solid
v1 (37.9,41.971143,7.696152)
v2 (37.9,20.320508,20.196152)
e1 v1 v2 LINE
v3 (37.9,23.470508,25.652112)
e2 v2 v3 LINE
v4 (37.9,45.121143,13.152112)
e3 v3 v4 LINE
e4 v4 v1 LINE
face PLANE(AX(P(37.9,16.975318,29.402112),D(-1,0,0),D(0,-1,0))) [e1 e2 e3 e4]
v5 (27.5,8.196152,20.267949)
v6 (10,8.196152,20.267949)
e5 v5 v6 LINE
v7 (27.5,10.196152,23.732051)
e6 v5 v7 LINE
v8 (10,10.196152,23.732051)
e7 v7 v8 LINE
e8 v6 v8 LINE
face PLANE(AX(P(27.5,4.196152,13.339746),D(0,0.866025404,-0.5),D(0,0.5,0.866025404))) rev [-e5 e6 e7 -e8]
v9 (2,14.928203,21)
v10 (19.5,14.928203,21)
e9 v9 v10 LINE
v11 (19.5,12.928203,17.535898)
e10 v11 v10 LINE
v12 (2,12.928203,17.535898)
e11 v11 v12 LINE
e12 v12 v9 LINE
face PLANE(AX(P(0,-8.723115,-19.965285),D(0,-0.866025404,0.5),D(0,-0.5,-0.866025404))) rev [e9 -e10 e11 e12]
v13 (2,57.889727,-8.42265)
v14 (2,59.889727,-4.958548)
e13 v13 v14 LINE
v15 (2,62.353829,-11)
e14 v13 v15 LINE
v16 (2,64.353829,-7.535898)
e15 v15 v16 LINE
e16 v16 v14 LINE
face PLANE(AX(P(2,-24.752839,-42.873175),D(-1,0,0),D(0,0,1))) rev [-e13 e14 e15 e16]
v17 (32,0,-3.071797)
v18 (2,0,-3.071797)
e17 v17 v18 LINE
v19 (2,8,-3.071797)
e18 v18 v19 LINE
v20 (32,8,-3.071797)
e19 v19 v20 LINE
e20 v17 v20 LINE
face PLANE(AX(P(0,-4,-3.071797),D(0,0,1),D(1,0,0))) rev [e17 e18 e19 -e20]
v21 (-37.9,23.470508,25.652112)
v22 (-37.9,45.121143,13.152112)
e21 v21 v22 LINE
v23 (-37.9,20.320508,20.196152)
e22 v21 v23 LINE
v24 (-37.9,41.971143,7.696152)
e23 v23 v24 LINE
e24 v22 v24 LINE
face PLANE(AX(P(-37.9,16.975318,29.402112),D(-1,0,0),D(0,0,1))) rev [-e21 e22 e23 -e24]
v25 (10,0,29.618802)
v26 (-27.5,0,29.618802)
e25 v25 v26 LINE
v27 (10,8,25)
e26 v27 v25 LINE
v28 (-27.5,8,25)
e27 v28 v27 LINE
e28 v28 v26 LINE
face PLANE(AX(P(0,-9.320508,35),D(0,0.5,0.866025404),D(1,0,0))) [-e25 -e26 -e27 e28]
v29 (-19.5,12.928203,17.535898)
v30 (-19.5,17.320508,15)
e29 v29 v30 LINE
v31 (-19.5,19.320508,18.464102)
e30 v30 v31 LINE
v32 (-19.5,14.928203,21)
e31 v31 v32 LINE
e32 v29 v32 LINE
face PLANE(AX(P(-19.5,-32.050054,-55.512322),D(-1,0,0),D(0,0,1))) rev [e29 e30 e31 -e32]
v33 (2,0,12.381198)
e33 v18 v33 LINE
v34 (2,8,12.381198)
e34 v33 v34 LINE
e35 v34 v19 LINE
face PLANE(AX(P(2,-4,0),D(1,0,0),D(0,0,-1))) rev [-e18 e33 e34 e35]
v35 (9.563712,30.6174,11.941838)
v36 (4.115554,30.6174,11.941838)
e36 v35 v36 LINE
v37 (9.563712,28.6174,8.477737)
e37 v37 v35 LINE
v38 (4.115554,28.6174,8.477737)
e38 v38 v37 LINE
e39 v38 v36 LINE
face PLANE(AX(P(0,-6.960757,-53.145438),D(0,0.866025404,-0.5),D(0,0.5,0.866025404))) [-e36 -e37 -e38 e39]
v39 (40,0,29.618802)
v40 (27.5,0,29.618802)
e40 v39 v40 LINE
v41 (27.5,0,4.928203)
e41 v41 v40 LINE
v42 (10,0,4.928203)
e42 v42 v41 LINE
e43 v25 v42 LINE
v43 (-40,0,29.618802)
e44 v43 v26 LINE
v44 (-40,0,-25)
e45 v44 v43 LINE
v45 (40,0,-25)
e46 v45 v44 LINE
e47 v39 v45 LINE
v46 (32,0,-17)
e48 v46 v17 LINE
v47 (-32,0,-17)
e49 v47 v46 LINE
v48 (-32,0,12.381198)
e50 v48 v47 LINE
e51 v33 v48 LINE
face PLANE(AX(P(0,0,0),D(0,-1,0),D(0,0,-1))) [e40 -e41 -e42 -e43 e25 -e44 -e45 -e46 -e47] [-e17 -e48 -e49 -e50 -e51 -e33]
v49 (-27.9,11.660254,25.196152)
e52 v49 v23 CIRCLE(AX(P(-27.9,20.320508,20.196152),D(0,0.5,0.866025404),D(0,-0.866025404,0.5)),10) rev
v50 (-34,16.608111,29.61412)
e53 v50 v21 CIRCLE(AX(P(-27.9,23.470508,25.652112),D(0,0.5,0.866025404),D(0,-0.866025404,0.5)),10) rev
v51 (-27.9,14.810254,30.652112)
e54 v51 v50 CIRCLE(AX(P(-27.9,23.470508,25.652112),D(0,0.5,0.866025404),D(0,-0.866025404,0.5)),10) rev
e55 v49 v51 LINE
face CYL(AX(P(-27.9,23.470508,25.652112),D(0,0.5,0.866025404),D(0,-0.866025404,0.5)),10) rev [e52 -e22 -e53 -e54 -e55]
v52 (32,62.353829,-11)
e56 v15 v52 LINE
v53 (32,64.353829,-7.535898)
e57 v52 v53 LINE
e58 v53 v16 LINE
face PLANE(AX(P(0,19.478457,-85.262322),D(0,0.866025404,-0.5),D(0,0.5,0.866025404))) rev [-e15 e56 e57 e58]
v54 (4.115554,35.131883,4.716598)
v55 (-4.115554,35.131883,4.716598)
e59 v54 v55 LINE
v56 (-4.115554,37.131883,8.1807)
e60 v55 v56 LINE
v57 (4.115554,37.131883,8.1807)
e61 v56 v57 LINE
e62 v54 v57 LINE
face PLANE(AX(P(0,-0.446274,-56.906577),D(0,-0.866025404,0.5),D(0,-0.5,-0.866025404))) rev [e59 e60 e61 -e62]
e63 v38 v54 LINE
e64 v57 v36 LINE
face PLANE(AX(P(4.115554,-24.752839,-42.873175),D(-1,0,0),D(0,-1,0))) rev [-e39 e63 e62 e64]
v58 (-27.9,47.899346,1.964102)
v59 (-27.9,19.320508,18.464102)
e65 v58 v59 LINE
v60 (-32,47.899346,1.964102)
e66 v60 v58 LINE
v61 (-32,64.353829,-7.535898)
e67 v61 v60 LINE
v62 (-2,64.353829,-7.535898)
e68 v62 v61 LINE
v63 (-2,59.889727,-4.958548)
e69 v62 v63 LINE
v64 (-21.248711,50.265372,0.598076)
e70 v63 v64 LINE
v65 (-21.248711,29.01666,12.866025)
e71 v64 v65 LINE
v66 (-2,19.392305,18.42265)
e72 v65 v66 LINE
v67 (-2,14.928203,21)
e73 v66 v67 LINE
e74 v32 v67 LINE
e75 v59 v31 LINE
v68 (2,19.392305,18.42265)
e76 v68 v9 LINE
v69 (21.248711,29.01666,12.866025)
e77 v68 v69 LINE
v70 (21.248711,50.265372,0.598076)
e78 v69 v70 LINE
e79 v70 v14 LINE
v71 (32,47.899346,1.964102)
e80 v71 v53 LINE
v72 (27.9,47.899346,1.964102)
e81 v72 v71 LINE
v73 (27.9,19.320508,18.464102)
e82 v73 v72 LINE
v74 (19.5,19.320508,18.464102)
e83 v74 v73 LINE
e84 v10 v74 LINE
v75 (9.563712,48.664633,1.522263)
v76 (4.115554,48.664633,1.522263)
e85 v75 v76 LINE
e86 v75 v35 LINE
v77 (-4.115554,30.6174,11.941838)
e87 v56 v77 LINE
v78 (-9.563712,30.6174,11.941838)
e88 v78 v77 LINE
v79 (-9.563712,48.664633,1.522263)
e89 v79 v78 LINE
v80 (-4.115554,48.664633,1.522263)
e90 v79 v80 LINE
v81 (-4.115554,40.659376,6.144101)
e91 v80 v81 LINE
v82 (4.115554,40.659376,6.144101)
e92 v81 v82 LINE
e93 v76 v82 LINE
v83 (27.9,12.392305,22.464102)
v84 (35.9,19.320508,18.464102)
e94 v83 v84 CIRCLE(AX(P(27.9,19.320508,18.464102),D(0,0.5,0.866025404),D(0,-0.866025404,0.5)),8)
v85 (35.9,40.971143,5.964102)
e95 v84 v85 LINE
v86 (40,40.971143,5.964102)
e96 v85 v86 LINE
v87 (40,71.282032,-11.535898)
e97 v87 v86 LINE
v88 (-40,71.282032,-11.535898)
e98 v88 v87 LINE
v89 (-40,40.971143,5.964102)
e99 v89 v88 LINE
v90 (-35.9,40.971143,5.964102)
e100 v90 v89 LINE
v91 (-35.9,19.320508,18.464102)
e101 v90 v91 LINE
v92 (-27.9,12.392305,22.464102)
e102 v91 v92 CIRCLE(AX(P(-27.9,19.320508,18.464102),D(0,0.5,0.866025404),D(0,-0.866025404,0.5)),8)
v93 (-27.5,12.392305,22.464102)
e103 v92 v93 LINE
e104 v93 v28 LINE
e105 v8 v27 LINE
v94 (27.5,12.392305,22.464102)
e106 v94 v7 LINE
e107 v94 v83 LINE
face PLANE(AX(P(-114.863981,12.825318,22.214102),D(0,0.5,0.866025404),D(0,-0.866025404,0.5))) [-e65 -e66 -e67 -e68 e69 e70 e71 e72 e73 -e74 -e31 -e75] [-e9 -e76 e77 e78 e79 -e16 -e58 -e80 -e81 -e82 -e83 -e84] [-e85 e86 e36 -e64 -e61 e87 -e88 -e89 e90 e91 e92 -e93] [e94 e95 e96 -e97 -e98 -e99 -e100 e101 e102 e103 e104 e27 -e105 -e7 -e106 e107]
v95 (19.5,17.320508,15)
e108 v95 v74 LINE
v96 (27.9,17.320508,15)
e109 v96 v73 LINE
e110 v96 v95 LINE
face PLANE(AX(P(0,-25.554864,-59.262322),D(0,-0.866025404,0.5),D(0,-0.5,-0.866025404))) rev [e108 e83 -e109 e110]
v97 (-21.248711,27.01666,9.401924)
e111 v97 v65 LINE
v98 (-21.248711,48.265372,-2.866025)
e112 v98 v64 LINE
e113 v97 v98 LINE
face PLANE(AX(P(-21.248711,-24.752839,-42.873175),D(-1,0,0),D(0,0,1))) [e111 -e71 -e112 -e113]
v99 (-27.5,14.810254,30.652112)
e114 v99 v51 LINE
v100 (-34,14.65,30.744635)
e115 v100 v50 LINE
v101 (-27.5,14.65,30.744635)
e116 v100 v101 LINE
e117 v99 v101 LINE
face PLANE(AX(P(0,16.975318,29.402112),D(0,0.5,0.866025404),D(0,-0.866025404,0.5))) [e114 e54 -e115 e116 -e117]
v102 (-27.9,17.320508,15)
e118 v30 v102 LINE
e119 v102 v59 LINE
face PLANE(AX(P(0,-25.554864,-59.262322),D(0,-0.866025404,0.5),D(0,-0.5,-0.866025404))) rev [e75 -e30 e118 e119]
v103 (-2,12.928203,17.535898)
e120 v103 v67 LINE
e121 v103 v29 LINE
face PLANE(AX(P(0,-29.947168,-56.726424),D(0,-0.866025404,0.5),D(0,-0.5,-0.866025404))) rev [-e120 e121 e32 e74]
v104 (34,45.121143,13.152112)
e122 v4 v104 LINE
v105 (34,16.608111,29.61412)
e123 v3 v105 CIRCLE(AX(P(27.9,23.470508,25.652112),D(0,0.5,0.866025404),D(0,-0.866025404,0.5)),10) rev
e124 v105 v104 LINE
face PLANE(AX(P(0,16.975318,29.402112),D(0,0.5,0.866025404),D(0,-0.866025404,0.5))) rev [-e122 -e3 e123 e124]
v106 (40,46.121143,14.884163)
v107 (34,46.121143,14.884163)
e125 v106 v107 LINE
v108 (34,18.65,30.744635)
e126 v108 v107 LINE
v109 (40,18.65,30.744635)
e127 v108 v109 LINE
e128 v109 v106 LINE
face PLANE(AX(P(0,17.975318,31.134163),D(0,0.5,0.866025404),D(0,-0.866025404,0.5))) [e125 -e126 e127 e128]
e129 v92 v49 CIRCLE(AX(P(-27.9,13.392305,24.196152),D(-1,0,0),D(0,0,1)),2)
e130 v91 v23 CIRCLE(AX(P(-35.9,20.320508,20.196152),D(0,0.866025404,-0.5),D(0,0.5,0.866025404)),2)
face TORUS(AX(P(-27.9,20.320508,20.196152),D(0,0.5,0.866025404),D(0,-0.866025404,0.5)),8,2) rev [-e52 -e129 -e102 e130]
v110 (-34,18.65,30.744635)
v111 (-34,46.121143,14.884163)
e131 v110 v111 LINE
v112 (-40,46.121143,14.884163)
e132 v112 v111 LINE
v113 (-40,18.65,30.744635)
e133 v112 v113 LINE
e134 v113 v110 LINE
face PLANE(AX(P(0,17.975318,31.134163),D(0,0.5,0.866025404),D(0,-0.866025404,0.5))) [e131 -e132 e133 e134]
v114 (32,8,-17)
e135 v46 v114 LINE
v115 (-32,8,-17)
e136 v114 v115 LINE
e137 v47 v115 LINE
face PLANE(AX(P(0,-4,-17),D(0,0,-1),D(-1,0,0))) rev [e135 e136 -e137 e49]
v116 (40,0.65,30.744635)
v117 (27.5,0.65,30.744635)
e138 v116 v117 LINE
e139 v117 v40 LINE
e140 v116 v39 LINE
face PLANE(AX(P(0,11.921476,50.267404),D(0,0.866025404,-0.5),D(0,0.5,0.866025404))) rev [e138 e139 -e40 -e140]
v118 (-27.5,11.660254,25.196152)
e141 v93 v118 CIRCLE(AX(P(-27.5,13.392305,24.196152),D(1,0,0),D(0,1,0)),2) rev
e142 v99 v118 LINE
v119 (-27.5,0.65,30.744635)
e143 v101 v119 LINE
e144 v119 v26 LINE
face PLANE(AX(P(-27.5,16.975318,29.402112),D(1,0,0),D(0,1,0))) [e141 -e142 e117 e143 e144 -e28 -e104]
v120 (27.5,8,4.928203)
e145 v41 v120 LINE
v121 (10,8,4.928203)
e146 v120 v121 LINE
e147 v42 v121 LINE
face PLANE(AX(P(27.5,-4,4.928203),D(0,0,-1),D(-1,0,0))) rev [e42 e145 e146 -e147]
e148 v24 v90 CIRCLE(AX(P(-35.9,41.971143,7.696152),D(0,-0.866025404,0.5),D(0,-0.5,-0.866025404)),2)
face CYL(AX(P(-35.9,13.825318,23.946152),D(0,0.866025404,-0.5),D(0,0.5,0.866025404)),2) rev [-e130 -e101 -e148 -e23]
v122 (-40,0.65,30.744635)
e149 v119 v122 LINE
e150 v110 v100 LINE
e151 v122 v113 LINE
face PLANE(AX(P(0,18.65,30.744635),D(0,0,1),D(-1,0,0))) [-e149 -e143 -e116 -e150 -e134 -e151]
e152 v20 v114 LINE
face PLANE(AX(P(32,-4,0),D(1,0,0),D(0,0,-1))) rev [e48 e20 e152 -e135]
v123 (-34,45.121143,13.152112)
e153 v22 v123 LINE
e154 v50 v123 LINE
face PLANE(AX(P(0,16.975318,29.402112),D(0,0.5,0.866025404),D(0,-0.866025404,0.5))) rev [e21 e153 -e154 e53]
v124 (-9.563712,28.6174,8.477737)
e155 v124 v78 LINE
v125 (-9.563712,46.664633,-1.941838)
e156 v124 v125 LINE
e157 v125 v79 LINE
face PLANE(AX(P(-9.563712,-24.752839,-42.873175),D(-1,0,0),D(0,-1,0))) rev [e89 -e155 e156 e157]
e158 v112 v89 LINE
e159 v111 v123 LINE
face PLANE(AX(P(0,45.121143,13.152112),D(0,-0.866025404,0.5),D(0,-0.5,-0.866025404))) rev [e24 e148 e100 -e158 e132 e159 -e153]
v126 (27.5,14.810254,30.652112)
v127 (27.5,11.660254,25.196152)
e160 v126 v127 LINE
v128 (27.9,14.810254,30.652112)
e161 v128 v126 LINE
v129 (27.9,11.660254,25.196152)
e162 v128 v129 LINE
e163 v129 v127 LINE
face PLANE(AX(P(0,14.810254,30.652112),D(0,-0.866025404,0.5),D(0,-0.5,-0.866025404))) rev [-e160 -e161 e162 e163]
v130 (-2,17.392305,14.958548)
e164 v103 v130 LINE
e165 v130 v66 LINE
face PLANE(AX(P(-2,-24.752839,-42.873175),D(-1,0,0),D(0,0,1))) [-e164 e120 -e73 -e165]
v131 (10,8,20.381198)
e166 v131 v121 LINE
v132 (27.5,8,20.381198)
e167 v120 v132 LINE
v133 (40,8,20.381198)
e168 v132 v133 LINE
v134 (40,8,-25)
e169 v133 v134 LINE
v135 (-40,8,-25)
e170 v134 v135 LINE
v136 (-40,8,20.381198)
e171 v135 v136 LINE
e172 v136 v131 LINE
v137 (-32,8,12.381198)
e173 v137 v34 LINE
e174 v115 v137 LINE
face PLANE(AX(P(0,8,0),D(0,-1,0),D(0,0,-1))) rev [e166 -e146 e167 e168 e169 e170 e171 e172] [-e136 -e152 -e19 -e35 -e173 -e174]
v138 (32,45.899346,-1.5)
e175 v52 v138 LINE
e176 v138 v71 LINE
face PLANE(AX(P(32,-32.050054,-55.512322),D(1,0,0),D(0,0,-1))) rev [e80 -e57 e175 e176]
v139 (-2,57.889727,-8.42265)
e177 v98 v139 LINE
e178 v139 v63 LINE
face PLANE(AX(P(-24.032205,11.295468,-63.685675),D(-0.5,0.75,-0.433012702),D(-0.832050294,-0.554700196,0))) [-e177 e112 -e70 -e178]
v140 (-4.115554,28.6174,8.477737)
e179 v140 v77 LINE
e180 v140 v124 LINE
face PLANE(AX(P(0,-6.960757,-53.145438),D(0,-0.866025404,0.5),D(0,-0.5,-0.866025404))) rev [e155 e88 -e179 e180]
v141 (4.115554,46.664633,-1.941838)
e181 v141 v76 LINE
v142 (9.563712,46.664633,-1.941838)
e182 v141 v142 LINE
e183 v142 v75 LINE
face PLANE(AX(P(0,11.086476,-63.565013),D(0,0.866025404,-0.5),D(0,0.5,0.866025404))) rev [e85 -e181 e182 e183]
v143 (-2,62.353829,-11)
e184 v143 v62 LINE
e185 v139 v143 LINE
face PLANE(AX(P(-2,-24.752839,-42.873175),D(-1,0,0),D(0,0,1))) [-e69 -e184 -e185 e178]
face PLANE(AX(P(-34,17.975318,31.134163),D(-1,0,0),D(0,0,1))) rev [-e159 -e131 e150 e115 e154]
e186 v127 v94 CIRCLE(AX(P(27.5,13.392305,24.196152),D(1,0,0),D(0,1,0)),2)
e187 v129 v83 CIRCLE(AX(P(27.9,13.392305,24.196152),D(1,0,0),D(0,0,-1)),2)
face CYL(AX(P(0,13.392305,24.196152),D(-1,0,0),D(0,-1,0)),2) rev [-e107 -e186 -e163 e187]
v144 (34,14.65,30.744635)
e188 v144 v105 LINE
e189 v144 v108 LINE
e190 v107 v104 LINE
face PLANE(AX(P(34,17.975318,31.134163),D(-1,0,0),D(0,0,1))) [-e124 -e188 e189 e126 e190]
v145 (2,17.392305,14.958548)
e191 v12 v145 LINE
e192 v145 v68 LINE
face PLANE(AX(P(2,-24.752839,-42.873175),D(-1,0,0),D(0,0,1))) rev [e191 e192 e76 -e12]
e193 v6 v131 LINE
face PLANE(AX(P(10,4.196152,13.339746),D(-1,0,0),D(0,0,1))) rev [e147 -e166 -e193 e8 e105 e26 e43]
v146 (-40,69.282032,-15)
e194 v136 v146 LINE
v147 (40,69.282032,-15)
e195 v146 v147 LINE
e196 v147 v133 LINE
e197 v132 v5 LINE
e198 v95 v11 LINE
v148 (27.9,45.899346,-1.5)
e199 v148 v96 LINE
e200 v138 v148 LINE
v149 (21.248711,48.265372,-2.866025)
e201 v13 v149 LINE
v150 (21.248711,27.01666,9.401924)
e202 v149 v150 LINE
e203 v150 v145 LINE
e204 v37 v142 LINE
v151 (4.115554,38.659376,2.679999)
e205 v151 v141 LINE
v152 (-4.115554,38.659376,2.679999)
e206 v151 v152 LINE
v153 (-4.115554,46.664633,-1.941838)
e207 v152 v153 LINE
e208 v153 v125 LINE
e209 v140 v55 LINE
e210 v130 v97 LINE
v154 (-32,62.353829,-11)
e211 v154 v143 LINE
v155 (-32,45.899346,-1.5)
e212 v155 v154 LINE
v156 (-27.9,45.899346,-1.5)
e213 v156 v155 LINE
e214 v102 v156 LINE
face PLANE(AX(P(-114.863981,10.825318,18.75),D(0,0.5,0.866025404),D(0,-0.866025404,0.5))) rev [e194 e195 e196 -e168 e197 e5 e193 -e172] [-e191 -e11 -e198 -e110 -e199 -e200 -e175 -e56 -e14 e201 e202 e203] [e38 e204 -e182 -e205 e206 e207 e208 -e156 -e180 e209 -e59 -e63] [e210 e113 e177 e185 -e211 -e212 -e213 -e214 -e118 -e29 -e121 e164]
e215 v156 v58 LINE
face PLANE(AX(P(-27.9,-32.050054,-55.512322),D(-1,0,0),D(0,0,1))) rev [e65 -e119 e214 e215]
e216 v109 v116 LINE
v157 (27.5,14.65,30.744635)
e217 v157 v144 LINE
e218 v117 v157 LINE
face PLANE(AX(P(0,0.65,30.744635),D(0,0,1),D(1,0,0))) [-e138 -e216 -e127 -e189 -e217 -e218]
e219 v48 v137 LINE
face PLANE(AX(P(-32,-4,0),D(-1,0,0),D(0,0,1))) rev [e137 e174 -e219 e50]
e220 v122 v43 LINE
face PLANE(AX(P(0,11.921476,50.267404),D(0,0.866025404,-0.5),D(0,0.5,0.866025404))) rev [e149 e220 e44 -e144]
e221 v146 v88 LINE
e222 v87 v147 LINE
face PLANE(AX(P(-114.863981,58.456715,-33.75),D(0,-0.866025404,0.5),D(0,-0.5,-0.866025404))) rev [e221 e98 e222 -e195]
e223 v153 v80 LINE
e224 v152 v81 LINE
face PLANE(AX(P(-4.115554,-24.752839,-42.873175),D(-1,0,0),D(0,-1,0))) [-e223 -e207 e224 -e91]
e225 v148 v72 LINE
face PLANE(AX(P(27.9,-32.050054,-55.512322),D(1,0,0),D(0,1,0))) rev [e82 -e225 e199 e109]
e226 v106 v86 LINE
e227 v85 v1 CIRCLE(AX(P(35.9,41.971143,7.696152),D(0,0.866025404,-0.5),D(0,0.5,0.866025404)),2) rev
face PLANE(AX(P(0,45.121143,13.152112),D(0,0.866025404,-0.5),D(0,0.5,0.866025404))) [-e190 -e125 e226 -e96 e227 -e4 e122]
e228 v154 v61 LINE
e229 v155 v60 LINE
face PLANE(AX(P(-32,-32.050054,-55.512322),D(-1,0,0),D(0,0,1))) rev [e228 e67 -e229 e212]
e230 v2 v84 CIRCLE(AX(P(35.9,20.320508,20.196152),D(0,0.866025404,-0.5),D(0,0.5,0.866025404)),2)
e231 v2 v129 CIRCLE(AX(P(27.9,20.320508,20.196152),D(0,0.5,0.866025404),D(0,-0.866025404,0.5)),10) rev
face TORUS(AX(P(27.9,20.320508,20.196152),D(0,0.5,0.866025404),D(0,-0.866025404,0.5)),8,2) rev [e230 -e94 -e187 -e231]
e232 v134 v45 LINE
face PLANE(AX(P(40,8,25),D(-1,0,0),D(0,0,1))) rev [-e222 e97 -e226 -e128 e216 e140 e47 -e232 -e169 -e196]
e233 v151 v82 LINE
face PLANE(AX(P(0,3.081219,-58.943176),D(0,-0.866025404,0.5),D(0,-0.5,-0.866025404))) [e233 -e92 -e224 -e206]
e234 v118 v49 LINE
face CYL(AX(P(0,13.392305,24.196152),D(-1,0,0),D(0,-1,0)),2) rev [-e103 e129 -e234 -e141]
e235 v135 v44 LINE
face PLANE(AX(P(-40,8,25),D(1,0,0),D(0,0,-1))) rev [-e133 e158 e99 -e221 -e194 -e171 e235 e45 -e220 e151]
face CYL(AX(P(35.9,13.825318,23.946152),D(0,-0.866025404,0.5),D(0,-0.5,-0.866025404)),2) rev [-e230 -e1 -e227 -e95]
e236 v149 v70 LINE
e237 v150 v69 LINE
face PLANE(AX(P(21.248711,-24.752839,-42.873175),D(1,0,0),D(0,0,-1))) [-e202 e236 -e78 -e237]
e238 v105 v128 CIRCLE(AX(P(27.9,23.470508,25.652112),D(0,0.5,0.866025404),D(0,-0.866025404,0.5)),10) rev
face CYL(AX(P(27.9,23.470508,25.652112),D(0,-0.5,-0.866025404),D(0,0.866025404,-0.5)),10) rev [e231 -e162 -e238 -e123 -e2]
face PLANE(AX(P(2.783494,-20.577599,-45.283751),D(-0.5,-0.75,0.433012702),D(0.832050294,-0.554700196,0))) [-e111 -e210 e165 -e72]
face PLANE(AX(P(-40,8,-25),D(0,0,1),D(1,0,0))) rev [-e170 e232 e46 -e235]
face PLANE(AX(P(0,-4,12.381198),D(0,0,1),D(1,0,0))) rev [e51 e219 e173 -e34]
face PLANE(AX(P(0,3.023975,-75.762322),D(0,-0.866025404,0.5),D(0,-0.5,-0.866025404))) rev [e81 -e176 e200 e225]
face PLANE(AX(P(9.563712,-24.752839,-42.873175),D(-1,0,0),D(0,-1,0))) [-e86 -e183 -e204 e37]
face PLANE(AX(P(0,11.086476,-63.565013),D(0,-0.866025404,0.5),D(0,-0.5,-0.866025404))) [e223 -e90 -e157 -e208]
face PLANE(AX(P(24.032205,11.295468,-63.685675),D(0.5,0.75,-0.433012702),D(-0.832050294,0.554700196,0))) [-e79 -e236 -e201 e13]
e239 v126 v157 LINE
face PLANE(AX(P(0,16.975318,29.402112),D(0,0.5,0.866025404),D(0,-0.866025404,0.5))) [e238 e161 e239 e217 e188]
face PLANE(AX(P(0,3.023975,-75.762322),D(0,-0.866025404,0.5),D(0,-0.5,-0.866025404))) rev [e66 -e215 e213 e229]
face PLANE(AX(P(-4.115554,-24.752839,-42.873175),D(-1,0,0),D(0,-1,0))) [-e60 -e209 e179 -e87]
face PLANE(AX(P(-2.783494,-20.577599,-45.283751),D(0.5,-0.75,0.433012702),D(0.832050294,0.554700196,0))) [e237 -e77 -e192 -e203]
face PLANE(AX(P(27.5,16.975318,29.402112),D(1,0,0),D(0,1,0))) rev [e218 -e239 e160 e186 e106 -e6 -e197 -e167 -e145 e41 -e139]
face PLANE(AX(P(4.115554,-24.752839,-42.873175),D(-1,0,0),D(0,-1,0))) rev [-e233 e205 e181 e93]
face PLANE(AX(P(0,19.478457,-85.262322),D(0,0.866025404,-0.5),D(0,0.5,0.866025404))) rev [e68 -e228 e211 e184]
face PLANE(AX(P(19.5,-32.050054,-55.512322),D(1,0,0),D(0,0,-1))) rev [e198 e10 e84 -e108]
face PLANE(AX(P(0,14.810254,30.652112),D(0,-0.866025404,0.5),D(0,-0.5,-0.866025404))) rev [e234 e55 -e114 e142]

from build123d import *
from OCP.BRepFilletAPI import BRepFilletAPI_MakeChamfer

# Parameters (mm, degrees)
SKETCH1_W           = 80
SKETCH1_H           = 50
BOSS_EXTRUDE1_DEPTH = 8
BOSS_EXTRUDE2_DEPTH = 80
SKETCH3_W           = 2.1
SKETCH3_H           = 35
BOSS_EXTRUDE3_DEPTH = 8.3
FILLET1_R           = 10
FILLET2_R           = 2
BOSS_EXTRUDE4_DEPTH = 10
CHAMFER2_SIZE       = 17.320508076
CHAMFER2_SIZE_2     = 10
SKETCH5_W           = 12.5
SKETCH5_H           = 9.237604307
BOSS_EXTRUDE5_DEPTH = 8.3
SKETCH6_W           = 6
SKETCH6_H           = 47.309401077
BOSS_EXTRUDE6_DEPTH = 2
CHAMFER3_SIZE       = 9
CHAMFER3_SIZE2      = 15.588457268
SKETCH7_W           = 17.5
SKETCH7_H           = 11.773502692
CUT_EXTRUDE1_DEPTH  = 12
SKETCH8_W           = 17.5
SKETCH8_H           = 15
CUT_EXTRUDE2_DEPTH  = 12
CUT_EXTRUDE3_DEPTH  = 12
CUT_EXTRUDE4_DEPTH  = 4
BOSS_EXTRUDE7_DEPTH = 4
CUT_EXTRUDE5_REACH  = 87.126
SKETCH12_W          = 17.5
SKETCH12_H          = 2.535898385


with BuildPart() as part:
    # Sketch1 → Boss-Extrude1 (new body)
    with BuildSketch(Plane(origin=(0, 0, 0), x_dir=(1, 0, 0), z_dir=(0, 1, 0))):
        Rectangle(SKETCH1_W, SKETCH1_H)
    extrude(amount=BOSS_EXTRUDE1_DEPTH)

    # Sketch2 → Boss-Extrude2 (add)
    with BuildSketch(Plane(origin=(40, 0, 0), x_dir=(0, 0, -1), z_dir=(1, 0, 0))):
        Polygon((15, 69.282032303), (11.535898385, 71.282032303), (-25, 8), (-20.381197846, 8), align=None)
    extrude(amount=-BOSS_EXTRUDE2_DEPTH)

    # Sketch3 → Boss-Extrude3 (add)
    with BuildSketch(Plane(origin=(0, 12.825317547, 22.214101615), x_dir=(1, 0, 0), z_dir=(0, 0.5000000000000041, 0.8660254037844364))):
        with Locations((-38.95, 15)):
            Rectangle(SKETCH3_W, SKETCH3_H)
        Polygon((-27.5, -5.57179677), (-27.5, -2.5), (-37.9, -2.5), (-40, -2.5), (-40, -5.57179677), align=None)
        Polygon((40, -5.57179677), (40, -2.5), (37.9, -2.5), (27.5, -2.5), (27.5, -5.57179677), align=None)
        with Locations((38.95, 15)):
            Rectangle(SKETCH3_W, SKETCH3_H)
    extrude(amount=BOSS_EXTRUDE3_DEPTH)

    # Fillet1
    fillet1_edges = [part.edges().sort_by_distance(p)[0] for p in [
        (-37.9, 12.735254038, 27.058107041),
        (37.9, 12.735254038, 27.058107041),
    ]]
    fillet(fillet1_edges, radius=FILLET1_R)

    # Fillet2
    fillet2_edges = [part.edges().sort_by_distance(p)[0] for p in [
        (-27.7, 10.660254038, 23.464101615),
        (-37.9, 30.145825623, 12.214101615),
        (27.7, 10.660254038, 23.464101615),
        (37.9, 30.145825623, 12.214101615),
        (34.971067812, 13.196783719, 21.999635521),
        (-34.971067812, 13.196783719, 21.999635521),
    ]]
    fillet(fillet2_edges, radius=FILLET2_R)

    # Sketch4 → Boss-Extrude4 (add)
    with BuildSketch(Plane.XY.offset(25)):
        Polygon((40, 0), (40, 8), (27.5, 8), (-27.5, 8), (-40, 8), (-40, 0), align=None)
    extrude(amount=BOSS_EXTRUDE4_DEPTH)

    # Chamfer2
    # the kernel refuses this chamfer: 17.320508076, 10 mm, written as the material it takes off along each edge
    with BuildSketch(Plane(origin=(-84.809639706, 8, 35), x_dir=(0, -0.999813220622208, 0.019326765612700497), z_dir=(1, 0, 0))) as chamfer2_piece_1:
        Polygon((CHAMFER2_SIZE * 0.999813220604, CHAMFER2_SIZE * 0.0193267656124), (-CHAMFER2_SIZE_2 * 0.0193267656127, CHAMFER2_SIZE_2 * 0.999813220622), (0, 0), align=None)
    extrude(amount=169.619279412, mode=Mode.SUBTRACT)

    # Sketch5 → Boss-Extrude5 (add)
    with BuildSketch(Plane(origin=(0, 12.825317547, 22.214101615), x_dir=(1, 0, 0), z_dir=(0, 0.49999999999999656, 0.8660254037844407))):
        with Locations((-33.75, -10.190598924)):
            Rectangle(SKETCH5_W, SKETCH5_H)
        with Locations((33.75, -10.190598924)):
            Rectangle(SKETCH5_W, SKETCH5_H)
    extrude(amount=BOSS_EXTRUDE5_DEPTH)

    # Sketch6 → Boss-Extrude6 (add)
    with BuildSketch(Plane(origin=(0, 16.975317547, 29.402112467), x_dir=(1, 0, 0), z_dir=(0, 0.5000000000000041, 0.8660254037844364))):
        with Locations((-37, 8.845299461)):
            Rectangle(SKETCH6_W, SKETCH6_H)
        with Locations((37, 8.845299461)):
            Rectangle(SKETCH6_W, SKETCH6_H)
    extrude(amount=BOSS_EXTRUDE6_DEPTH)

    # Chamfer3: one chamfer whose edges measure the first distance from different faces: ONE call of the kernel's chamfer builder (chamfer() names one face for all edges)
    chamfer3_edges_1 = [part.edges().sort_by_distance(p)[0] for p in [
        (-37, 5.15, 38.538863812),
    ]]
    chamfer3_side_1 = [part.faces().sort_by_distance(p)[0] for p in [
        (-34.086933045, 2.341954644, 33.675186585),
    ]]
    chamfer3_edges_2 = [part.edges().sort_by_distance(p)[0] for p in [
        (37, 5.15, 38.538863812),
    ]]
    chamfer3_side_2 = [part.faces().sort_by_distance(p)[0] for p in [
        (34.086933045, 2.341954644, 33.675186585),
    ]]
    chamfer3 = BRepFilletAPI_MakeChamfer(part.part.solid().wrapped)
    for e in chamfer3_edges_1:
        chamfer3.Add(CHAMFER3_SIZE, CHAMFER3_SIZE2, e.wrapped, chamfer3_side_1[0].wrapped)  # the first distance lies on this face
    for e in chamfer3_edges_2:
        chamfer3.Add(CHAMFER3_SIZE, CHAMFER3_SIZE2, e.wrapped, chamfer3_side_2[0].wrapped)  # the first distance lies on this face
    add(Compound.cast(chamfer3.Shape()), mode=Mode.REPLACE)

    # Sketch7 → Cut-Extrude1 (cut)
    with BuildSketch(Plane(origin=(0, 12.825317547, 22.214101615), x_dir=(1, 0, 0), z_dir=(0, 0.49999999999999656, 0.8660254037844407))):
        with Locations((18.75, -8.922649731)):
            Rectangle(SKETCH7_W, SKETCH7_H)
    extrude(amount=-CUT_EXTRUDE1_DEPTH, mode=Mode.SUBTRACT)

    # Sketch8 → Cut-Extrude2 (cut)
    with BuildSketch(Plane(origin=(0, 8, 0), x_dir=(1, 0, 0), z_dir=(0, 1, 0))):
        with Locations((18.75, -12.42820323)):
            Rectangle(SKETCH8_W, SKETCH8_H)
    extrude(amount=-CUT_EXTRUDE2_DEPTH, mode=Mode.SUBTRACT)

    # Sketch9 → Cut-Extrude3 (cut)
    with BuildSketch(Plane(origin=(0, 8, 0), x_dir=(1, 0, 0), z_dir=(0, 1, 0))):
        Polygon((-32, -12.381197846), (2, -12.381197846), (2, 3.07179677), (32, 3.07179677), (32, 17), (-32, 17), align=None)
    extrude(amount=-CUT_EXTRUDE3_DEPTH, mode=Mode.SUBTRACT)

    # Sketch10 → Cut-Extrude4 (cut)
    with BuildSketch(Plane(origin=(0, 12.825317547, 22.214101615), x_dir=(1, 0, 0), z_dir=(0, 0.500000000000004, 0.8660254037844365))):
        Polygon((-19.5, 7.5), (-19.5, 2.42820323), (2, 2.42820323), (2, 4.964101615), (19.5, 4.964101615), (19.5, 7.5), (27.9, 7.5), (27.9, 40.5), (32, 40.5), (32, 59.5), (-32, 59.5), (-32, 40.5), (-27.9, 40.5), (-27.9, 7.5), align=None)
    extrude(amount=-CUT_EXTRUDE4_DEPTH, mode=Mode.SUBTRACT)

    # Sketch11 → Boss-Extrude7 (add)
    with BuildSketch(Plane(origin=(0, 12.825317547, 22.214101615), x_dir=(1, 0, 0), z_dir=(0, 0.500000000000004, 0.8660254037844365))):
        Polygon((-2, 32.140001961), (-2, 54.345299462), (-21.248711306, 43.232050808), (-21.248711306, 18.696152423), (-2, 7.582903769), (-2, 28.066803955), (-4.115553581, 28.066803955), (-4.115553581, 20.544526768), (-9.563712394, 20.544526768), (-9.563712394, 41.383676462), (-4.115553581, 41.383676462), (-4.115553581, 32.140001961), align=None)
        Polygon((21.248711306, 43.232050808), (2, 54.345299462), (2, 32.140001961), (4.115553581, 32.140001961), (4.115553581, 41.383676462), (9.563712394, 41.383676462), (9.563712394, 20.544526768), (4.115553581, 20.544526768), (4.115553581, 28.066803955), (2, 28.066803955), (2, 7.582903769), (21.248711306, 18.696152423), align=None)
        Polygon((2, 54.345299462), (0, 55.5), (-2, 54.345299462), (-2, 32.140001961), (0, 32.140001961), (2, 32.140001961), align=None)
        Polygon((-2, 54.345299462), (0, 55.5), (2, 54.345299462), (2, 59.5), (-2, 59.5), align=None)
        Polygon((0, 6.42820323), (-2, 7.582903769), (-2, 2.42820323), (2, 2.42820323), (2, 4.964101615), (2, 7.582903769), align=None)
        Polygon((0, 28.066803955), (-2, 28.066803955), (-2, 7.582903769), (0, 6.42820323), (2, 7.582903769), (2, 28.066803955), align=None)
    extrude(amount=-BOSS_EXTRUDE7_DEPTH)

    # Sketch12 → Cut-Extrude5 (cut, up to next)
    with BuildSketch(Plane(origin=(0, 12.825317547, 22.214101615), x_dir=(1, 0, 0), z_dir=(0, 0.500000000000004, 0.8660254037844365)), mode=Mode.PRIVATE) as cut_extrude5_sk1:
        with Locations((10.75, 3.696152423)):
            Rectangle(SKETCH12_W, SKETCH12_H)
    cut_extrude5_tool1 = extrude(cut_extrude5_sk1.sketch, amount=-CUT_EXTRUDE5_REACH, mode=Mode.PRIVATE) & part.part
    add(cut_extrude5_tool1.solids().sort_by_distance((10.75, 16.026279, 20.366025))[0], mode=Mode.SUBTRACT)


solid = part.part
